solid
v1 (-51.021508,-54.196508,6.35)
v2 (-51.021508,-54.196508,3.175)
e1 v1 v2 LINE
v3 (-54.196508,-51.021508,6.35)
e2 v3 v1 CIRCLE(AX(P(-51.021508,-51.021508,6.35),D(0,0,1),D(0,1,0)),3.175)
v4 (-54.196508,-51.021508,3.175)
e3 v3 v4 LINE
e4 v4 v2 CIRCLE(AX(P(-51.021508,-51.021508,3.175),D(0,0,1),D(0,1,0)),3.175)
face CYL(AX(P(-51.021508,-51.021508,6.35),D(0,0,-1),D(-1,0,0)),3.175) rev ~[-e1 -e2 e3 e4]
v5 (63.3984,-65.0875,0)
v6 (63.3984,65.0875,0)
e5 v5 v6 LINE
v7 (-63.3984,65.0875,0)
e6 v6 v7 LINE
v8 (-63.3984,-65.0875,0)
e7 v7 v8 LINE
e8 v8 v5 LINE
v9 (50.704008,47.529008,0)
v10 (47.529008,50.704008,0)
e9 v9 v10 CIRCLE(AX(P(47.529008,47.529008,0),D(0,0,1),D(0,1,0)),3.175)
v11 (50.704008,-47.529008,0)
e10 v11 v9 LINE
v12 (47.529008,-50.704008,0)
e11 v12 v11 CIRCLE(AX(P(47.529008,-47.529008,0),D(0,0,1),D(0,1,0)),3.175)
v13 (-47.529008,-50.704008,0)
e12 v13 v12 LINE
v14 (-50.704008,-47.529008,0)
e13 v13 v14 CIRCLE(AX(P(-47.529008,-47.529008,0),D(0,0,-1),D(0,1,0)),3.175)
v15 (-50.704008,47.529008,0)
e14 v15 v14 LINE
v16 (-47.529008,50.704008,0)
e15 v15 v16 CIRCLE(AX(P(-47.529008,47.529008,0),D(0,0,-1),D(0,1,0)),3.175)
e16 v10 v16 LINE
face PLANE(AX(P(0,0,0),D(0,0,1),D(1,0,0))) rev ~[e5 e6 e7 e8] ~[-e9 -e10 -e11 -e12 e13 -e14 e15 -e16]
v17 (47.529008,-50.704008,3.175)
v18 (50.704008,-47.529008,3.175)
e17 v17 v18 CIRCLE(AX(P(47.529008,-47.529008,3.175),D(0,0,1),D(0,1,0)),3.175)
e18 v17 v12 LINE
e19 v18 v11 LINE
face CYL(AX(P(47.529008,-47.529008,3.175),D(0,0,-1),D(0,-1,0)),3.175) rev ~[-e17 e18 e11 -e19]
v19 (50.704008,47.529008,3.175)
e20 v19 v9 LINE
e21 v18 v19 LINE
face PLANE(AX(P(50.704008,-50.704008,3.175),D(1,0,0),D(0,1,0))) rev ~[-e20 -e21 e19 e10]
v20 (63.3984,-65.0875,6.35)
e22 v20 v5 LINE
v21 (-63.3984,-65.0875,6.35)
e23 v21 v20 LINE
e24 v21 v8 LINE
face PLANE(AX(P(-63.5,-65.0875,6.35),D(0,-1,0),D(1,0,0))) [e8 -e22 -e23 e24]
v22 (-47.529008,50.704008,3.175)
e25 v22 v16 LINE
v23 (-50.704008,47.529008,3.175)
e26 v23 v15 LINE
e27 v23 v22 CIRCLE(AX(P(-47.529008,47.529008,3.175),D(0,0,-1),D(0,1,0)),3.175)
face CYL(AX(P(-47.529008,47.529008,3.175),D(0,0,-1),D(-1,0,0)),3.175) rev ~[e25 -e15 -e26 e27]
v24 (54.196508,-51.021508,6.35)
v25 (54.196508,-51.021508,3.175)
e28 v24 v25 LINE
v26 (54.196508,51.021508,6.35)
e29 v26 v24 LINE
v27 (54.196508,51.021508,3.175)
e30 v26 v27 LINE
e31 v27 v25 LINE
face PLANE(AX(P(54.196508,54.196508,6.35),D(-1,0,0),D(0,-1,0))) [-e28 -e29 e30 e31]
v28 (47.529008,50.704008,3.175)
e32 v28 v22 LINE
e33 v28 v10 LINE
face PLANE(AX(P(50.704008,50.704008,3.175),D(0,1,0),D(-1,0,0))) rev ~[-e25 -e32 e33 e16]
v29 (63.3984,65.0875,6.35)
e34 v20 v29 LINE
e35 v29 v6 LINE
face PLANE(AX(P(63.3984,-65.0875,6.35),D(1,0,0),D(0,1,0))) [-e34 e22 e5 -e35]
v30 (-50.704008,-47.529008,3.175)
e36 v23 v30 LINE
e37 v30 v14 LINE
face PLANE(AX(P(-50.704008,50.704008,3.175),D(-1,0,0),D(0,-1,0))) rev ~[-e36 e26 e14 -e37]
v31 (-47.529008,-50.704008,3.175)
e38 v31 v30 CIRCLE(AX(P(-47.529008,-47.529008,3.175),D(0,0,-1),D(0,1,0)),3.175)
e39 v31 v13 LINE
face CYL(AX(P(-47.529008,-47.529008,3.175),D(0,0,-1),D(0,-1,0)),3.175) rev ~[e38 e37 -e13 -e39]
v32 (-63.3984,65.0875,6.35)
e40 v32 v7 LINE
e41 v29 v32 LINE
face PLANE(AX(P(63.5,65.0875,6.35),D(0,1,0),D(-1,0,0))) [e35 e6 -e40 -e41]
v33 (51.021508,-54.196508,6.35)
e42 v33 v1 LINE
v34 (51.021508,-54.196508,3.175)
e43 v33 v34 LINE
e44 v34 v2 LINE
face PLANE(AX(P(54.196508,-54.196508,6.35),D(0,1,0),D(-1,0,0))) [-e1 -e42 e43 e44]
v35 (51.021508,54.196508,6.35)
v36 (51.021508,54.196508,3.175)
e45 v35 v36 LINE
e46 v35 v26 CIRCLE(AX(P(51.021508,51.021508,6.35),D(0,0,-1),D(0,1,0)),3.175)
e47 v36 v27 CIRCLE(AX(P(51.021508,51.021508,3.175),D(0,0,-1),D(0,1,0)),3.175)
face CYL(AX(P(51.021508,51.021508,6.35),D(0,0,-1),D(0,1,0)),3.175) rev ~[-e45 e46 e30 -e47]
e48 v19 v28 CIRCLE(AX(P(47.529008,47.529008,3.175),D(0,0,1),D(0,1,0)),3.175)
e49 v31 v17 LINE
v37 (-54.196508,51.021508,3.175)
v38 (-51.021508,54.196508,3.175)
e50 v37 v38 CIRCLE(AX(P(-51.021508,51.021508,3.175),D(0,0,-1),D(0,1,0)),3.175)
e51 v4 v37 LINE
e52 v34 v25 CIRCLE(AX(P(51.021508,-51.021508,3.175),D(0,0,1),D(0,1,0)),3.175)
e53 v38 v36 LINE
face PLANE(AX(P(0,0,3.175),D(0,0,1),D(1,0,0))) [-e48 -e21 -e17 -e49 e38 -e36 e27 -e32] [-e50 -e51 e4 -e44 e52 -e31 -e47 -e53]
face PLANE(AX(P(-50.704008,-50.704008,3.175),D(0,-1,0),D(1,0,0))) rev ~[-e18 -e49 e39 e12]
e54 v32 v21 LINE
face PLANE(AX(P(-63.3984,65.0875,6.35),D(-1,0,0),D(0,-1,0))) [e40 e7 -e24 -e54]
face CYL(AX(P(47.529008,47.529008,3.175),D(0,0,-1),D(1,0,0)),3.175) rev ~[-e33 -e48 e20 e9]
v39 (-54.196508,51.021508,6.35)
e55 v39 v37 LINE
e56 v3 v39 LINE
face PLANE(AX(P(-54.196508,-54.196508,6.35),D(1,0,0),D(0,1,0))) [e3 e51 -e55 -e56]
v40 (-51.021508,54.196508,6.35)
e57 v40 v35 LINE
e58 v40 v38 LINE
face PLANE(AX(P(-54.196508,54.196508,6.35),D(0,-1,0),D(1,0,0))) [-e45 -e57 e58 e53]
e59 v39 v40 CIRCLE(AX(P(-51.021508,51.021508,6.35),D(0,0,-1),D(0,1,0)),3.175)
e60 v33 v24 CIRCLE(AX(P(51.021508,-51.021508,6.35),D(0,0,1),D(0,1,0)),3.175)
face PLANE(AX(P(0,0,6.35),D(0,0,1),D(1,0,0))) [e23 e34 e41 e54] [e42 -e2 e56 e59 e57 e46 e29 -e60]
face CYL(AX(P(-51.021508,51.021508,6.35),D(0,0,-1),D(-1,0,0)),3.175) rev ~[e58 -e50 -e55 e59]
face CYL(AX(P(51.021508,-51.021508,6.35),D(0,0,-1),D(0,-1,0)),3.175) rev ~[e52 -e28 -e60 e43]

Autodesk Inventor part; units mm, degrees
ref_plane "YZ Plane" through (0, 0, 0) normal (1, 0, 0) x (0, 1, 0)
ref_plane "XZ Plane" through (0, 0, 0) normal (0, 1, 0) x (-1, 0, 0)
ref_plane "XY Plane" through (0, 0, 0) normal (0, 0, 1) x (1, 0, 0)
sketch "Sketch1" plane through (0, 0, 0) normal (0, 0, 1) x (1, 0, 0)
  line L0 (-53.975, 57.15) -> (53.975, 57.15) projected
  line L1 (57.15, 53.975) -> (57.15, -53.975) projected
  line L2 (53.975, -57.15) -> (-53.975, -57.15) projected
  line L3 (-57.15, -53.975) -> (-57.15, 53.975) projected
  line L4 (-63.3984, -63.5) -> (63.3984, -63.5) projected
  line L5 (63.3984, -63.5) -> (63.3984, 63.5) projected
  line L6 (63.3984, 63.5) -> (-63.3984, 63.5) projected
  line L7 (-63.3984, 63.5) -> (-63.3984, -63.5) projected
  arc A0 (57.15, 53.975) -> (53.975, 57.15) centre (53.975, 53.975) ccw projected
  arc A1 (53.975, -57.15) -> (57.15, -53.975) centre (53.975, -53.975) ccw projected
  arc A2 (-57.15, -53.975) -> (-53.975, -57.15) centre (-53.975, -53.975) ccw projected
  arc A3 (-53.975, 57.15) -> (-57.15, 53.975) centre (-53.975, 53.975) ccw projected
  point P0 (0, 0)
extrude "Extrusion1" add sketch "Sketch1" along normal blind 6.35 contours L0 A0 L1 A1 L2 A2 L3 A3 | L7 L6 L5 L4
sketch "Sketch2" plane through (0, 0, 6.35) normal (0, 0, 1) x (1, 0, 0)
  line L0 (50.704008, 50.704008) -> (-50.704008, 50.704008)
  line L1 (50.704008, -50.704008) -> (50.704008, 50.704008)
  line L2 (-50.704008, -50.704008) -> (50.704008, -50.704008)
  line L3 (-50.704008, 50.704008) -> (-50.704008, -50.704008)
  line L4 (-54.196508, 54.196508) -> (54.196508, 54.196508)
  line L5 (54.196508, 54.196508) -> (54.196508, -54.196508)
  line L6 (54.196508, -54.196508) -> (-54.196508, -54.196508)
  line L7 (-54.196508, -54.196508) -> (-54.196508, 54.196508)
  point P0 (0, 0)
  dimension "d2" = 3.4925
extrude "Extrusion2" cut sketch "Sketch2" against normal blind 3.175 contours L1 L2 L3 L0 | L4 L5 L6 L7
sketch "Sketch3" plane through (0, 0, 3.175) normal (0, 0, 1) x (1, 0, 0)
  line L0 (50.704008, 50.704008) -> (-50.704008, 50.704008)
  line L1 (-50.704008, 50.704008) -> (-50.704008, -50.704008)
  line L2 (44.233392, -50.704008) -> (44.233392, 50.704008)
  line L3 (-50.704008, -50.704008) -> (50.704008, -50.704008)
  point P0 (0, 0)
sketch "Sketch3 outline for Extrusion3" plane through (0, 0, 3.175) normal (0, 0, 1) x (1, 0, 0)
  line L0 (50.704008, -50.704008) -> (50.704008, 50.704008)
  line L1 (-50.704008, -50.704008) -> (50.704008, -50.704008)
  line L2 (-50.704008, 50.704008) -> (-50.704008, -50.704008)
  line L3 (50.704008, 50.704008) -> (-50.704008, 50.704008)
extrude "Extrusion3" cut sketch "Sketch3 outline for Extrusion3" against normal through all
sketch "Sketch4" plane through (0, 0, 6.35) normal (0, 0, 1) x (1, 0, 0)
  line L0 (-63.5, -65.0875) -> (63.5, -65.0875)
  line L1 (63.5, -65.0875) -> (63.5, 65.0875)
  line L2 (63.5, 65.0875) -> (-63.5, 65.0875)
  line L3 (-63.5, 65.0875) -> (-63.5, -65.0875)
  line L4 (-63.5, -65.0875) -> (63.5, 65.0875) construction
  line L5 (63.5, -65.0875) -> (-63.5, 65.0875) construction
  line L6 (-54.196508, -54.196508) -> (-54.196508, 54.196508)
  line L7 (-54.196508, 54.196508) -> (54.196508, 54.196508)
  line L8 (54.196508, 54.196508) -> (54.196508, -54.196508)
  line L9 (54.196508, -54.196508) -> (-54.196508, -54.196508)
  line L10 (-63.3984, -63.5) -> (63.3984, -63.5)
  line L11 (63.3984, -63.5) -> (63.3984, 63.5)
  line L12 (63.3984, 63.5) -> (-63.3984, 63.5)
  line L13 (-63.3984, 63.5) -> (-63.3984, -63.5)
  point P0 (0, 0)
  dimension "d7" = 130.175
  dimension "d8" = 127
extrude "Extrusion4" add sketch "Sketch4" against normal up to surface (6.35 mm away) contours L3 L2 L1 L0
sketch "Sketch5" plane through (0, 0, 6.35) normal (0, 0, 1) x (1, 0, 0)
  line L0 (63.5, 65.0875) -> (-63.5, 65.0875) projected
  line L1 (-63.3984, -65.0875) -> (63.3984, -65.0875)
  line L2 (63.3984, -65.0875) -> (63.3984, 65.0875)
  line L3 (63.3984, 65.0875) -> (-63.3984, 65.0875)
  line L4 (-63.3984, 65.0875) -> (-63.3984, -65.0875)
  line L5 (-63.3984, -65.0875) -> (63.3984, 65.0875) construction
  line L6 (63.3984, -65.0875) -> (-63.3984, 65.0875) construction
  point P0 (0, 0)
  dimension "d11" = 126.7968
extrude "Extrusion5" cut sketch "Sketch5" against normal through all keep common part
fillet "Fillet1" radius 3.175 8 edges at (-54.1965, 54.1965, 4.7625) (-54.1965, -54.1965, 4.7625) (-50.704, -50.704, 1.5875) (54.1965, 54.1965, 4.7625) (50.704, -50.704, 1.5875) (54.1965, -54.1965, 4.7625) (50.704, 50.704, 1.5875) (-50.704, 50.704, 1.5875)
equation "\"d0\" = plasticThickness"
equation "\"d2\" = 1.1 * mirrorThickness"
equation "\"d3\" = 0.5 * plasticThickness"
equation "\"d5\" = 0.5 * internalAcrylicThickness"
equation "\"d7\" = height + 2 * alignmentGrooveDepth"
equation "\"d8\" = width"
equation "\"d11\" = width - 2 * alignmentGrooveClearance"
equation "\"frameAcrylicThickness\" = 9.525"
equation "\"internalAcrylicThickness\" = 6.35"
equation "\"height\" = 127"
equation "\"width\" = 127"
equation "\"depth\" = 203.2"
equation "\"mirrorAngle\" = 2.5deg"
equation "\"detectorWidth\" = 52"
equation "\"detectorHeight\" = 52"
equation "\"mirrorThickness\" = 3.175"
equation "\"fresnelThickness\" = 0.254"
equation "\"focalLength\" = 152.4"
equation "\"ior\" = 1.49"
equation "\"centerThickness\" = 1.27"
equation "\"fresnelAngle\" = 90deg"
equation "\"fresnelEffectiveDiameter\" = 152.4"
equation "\"oRingWidth\" = 1.5875"
equation "\"sensorHolderDepth\" = 19.05"
equation "\"aerogelClearence\" = 3.175"
equation "\"backplanePCBWidth\" = 76.2"
equation "\"backplanePCBHeight\" = 76.2"
equation "\"backplaneHoleOffsett\" = 6.35"
equation "\"backplanePostionOffsett\" = 12.7"
equation "\"moduleSlotClearence\" = 0.79375"
equation "\"plasticThickness\" = 6.35"
equation "\"aerogelHolderDepth\" = 49.022"
equation "\"caseThickness\" = 6.35"
equation "\"alignmentGrooveDepth\" = 1.5875"
equation "\"alignmentGrooveClearance\" = 0.1016"
equation "\"frontPanelThickness\" = 1.5875"
equation "\"fresnelGrooveWidth\" = 1.778"
properties part number "mirrorBackFrame" material "ABS Plastic"
